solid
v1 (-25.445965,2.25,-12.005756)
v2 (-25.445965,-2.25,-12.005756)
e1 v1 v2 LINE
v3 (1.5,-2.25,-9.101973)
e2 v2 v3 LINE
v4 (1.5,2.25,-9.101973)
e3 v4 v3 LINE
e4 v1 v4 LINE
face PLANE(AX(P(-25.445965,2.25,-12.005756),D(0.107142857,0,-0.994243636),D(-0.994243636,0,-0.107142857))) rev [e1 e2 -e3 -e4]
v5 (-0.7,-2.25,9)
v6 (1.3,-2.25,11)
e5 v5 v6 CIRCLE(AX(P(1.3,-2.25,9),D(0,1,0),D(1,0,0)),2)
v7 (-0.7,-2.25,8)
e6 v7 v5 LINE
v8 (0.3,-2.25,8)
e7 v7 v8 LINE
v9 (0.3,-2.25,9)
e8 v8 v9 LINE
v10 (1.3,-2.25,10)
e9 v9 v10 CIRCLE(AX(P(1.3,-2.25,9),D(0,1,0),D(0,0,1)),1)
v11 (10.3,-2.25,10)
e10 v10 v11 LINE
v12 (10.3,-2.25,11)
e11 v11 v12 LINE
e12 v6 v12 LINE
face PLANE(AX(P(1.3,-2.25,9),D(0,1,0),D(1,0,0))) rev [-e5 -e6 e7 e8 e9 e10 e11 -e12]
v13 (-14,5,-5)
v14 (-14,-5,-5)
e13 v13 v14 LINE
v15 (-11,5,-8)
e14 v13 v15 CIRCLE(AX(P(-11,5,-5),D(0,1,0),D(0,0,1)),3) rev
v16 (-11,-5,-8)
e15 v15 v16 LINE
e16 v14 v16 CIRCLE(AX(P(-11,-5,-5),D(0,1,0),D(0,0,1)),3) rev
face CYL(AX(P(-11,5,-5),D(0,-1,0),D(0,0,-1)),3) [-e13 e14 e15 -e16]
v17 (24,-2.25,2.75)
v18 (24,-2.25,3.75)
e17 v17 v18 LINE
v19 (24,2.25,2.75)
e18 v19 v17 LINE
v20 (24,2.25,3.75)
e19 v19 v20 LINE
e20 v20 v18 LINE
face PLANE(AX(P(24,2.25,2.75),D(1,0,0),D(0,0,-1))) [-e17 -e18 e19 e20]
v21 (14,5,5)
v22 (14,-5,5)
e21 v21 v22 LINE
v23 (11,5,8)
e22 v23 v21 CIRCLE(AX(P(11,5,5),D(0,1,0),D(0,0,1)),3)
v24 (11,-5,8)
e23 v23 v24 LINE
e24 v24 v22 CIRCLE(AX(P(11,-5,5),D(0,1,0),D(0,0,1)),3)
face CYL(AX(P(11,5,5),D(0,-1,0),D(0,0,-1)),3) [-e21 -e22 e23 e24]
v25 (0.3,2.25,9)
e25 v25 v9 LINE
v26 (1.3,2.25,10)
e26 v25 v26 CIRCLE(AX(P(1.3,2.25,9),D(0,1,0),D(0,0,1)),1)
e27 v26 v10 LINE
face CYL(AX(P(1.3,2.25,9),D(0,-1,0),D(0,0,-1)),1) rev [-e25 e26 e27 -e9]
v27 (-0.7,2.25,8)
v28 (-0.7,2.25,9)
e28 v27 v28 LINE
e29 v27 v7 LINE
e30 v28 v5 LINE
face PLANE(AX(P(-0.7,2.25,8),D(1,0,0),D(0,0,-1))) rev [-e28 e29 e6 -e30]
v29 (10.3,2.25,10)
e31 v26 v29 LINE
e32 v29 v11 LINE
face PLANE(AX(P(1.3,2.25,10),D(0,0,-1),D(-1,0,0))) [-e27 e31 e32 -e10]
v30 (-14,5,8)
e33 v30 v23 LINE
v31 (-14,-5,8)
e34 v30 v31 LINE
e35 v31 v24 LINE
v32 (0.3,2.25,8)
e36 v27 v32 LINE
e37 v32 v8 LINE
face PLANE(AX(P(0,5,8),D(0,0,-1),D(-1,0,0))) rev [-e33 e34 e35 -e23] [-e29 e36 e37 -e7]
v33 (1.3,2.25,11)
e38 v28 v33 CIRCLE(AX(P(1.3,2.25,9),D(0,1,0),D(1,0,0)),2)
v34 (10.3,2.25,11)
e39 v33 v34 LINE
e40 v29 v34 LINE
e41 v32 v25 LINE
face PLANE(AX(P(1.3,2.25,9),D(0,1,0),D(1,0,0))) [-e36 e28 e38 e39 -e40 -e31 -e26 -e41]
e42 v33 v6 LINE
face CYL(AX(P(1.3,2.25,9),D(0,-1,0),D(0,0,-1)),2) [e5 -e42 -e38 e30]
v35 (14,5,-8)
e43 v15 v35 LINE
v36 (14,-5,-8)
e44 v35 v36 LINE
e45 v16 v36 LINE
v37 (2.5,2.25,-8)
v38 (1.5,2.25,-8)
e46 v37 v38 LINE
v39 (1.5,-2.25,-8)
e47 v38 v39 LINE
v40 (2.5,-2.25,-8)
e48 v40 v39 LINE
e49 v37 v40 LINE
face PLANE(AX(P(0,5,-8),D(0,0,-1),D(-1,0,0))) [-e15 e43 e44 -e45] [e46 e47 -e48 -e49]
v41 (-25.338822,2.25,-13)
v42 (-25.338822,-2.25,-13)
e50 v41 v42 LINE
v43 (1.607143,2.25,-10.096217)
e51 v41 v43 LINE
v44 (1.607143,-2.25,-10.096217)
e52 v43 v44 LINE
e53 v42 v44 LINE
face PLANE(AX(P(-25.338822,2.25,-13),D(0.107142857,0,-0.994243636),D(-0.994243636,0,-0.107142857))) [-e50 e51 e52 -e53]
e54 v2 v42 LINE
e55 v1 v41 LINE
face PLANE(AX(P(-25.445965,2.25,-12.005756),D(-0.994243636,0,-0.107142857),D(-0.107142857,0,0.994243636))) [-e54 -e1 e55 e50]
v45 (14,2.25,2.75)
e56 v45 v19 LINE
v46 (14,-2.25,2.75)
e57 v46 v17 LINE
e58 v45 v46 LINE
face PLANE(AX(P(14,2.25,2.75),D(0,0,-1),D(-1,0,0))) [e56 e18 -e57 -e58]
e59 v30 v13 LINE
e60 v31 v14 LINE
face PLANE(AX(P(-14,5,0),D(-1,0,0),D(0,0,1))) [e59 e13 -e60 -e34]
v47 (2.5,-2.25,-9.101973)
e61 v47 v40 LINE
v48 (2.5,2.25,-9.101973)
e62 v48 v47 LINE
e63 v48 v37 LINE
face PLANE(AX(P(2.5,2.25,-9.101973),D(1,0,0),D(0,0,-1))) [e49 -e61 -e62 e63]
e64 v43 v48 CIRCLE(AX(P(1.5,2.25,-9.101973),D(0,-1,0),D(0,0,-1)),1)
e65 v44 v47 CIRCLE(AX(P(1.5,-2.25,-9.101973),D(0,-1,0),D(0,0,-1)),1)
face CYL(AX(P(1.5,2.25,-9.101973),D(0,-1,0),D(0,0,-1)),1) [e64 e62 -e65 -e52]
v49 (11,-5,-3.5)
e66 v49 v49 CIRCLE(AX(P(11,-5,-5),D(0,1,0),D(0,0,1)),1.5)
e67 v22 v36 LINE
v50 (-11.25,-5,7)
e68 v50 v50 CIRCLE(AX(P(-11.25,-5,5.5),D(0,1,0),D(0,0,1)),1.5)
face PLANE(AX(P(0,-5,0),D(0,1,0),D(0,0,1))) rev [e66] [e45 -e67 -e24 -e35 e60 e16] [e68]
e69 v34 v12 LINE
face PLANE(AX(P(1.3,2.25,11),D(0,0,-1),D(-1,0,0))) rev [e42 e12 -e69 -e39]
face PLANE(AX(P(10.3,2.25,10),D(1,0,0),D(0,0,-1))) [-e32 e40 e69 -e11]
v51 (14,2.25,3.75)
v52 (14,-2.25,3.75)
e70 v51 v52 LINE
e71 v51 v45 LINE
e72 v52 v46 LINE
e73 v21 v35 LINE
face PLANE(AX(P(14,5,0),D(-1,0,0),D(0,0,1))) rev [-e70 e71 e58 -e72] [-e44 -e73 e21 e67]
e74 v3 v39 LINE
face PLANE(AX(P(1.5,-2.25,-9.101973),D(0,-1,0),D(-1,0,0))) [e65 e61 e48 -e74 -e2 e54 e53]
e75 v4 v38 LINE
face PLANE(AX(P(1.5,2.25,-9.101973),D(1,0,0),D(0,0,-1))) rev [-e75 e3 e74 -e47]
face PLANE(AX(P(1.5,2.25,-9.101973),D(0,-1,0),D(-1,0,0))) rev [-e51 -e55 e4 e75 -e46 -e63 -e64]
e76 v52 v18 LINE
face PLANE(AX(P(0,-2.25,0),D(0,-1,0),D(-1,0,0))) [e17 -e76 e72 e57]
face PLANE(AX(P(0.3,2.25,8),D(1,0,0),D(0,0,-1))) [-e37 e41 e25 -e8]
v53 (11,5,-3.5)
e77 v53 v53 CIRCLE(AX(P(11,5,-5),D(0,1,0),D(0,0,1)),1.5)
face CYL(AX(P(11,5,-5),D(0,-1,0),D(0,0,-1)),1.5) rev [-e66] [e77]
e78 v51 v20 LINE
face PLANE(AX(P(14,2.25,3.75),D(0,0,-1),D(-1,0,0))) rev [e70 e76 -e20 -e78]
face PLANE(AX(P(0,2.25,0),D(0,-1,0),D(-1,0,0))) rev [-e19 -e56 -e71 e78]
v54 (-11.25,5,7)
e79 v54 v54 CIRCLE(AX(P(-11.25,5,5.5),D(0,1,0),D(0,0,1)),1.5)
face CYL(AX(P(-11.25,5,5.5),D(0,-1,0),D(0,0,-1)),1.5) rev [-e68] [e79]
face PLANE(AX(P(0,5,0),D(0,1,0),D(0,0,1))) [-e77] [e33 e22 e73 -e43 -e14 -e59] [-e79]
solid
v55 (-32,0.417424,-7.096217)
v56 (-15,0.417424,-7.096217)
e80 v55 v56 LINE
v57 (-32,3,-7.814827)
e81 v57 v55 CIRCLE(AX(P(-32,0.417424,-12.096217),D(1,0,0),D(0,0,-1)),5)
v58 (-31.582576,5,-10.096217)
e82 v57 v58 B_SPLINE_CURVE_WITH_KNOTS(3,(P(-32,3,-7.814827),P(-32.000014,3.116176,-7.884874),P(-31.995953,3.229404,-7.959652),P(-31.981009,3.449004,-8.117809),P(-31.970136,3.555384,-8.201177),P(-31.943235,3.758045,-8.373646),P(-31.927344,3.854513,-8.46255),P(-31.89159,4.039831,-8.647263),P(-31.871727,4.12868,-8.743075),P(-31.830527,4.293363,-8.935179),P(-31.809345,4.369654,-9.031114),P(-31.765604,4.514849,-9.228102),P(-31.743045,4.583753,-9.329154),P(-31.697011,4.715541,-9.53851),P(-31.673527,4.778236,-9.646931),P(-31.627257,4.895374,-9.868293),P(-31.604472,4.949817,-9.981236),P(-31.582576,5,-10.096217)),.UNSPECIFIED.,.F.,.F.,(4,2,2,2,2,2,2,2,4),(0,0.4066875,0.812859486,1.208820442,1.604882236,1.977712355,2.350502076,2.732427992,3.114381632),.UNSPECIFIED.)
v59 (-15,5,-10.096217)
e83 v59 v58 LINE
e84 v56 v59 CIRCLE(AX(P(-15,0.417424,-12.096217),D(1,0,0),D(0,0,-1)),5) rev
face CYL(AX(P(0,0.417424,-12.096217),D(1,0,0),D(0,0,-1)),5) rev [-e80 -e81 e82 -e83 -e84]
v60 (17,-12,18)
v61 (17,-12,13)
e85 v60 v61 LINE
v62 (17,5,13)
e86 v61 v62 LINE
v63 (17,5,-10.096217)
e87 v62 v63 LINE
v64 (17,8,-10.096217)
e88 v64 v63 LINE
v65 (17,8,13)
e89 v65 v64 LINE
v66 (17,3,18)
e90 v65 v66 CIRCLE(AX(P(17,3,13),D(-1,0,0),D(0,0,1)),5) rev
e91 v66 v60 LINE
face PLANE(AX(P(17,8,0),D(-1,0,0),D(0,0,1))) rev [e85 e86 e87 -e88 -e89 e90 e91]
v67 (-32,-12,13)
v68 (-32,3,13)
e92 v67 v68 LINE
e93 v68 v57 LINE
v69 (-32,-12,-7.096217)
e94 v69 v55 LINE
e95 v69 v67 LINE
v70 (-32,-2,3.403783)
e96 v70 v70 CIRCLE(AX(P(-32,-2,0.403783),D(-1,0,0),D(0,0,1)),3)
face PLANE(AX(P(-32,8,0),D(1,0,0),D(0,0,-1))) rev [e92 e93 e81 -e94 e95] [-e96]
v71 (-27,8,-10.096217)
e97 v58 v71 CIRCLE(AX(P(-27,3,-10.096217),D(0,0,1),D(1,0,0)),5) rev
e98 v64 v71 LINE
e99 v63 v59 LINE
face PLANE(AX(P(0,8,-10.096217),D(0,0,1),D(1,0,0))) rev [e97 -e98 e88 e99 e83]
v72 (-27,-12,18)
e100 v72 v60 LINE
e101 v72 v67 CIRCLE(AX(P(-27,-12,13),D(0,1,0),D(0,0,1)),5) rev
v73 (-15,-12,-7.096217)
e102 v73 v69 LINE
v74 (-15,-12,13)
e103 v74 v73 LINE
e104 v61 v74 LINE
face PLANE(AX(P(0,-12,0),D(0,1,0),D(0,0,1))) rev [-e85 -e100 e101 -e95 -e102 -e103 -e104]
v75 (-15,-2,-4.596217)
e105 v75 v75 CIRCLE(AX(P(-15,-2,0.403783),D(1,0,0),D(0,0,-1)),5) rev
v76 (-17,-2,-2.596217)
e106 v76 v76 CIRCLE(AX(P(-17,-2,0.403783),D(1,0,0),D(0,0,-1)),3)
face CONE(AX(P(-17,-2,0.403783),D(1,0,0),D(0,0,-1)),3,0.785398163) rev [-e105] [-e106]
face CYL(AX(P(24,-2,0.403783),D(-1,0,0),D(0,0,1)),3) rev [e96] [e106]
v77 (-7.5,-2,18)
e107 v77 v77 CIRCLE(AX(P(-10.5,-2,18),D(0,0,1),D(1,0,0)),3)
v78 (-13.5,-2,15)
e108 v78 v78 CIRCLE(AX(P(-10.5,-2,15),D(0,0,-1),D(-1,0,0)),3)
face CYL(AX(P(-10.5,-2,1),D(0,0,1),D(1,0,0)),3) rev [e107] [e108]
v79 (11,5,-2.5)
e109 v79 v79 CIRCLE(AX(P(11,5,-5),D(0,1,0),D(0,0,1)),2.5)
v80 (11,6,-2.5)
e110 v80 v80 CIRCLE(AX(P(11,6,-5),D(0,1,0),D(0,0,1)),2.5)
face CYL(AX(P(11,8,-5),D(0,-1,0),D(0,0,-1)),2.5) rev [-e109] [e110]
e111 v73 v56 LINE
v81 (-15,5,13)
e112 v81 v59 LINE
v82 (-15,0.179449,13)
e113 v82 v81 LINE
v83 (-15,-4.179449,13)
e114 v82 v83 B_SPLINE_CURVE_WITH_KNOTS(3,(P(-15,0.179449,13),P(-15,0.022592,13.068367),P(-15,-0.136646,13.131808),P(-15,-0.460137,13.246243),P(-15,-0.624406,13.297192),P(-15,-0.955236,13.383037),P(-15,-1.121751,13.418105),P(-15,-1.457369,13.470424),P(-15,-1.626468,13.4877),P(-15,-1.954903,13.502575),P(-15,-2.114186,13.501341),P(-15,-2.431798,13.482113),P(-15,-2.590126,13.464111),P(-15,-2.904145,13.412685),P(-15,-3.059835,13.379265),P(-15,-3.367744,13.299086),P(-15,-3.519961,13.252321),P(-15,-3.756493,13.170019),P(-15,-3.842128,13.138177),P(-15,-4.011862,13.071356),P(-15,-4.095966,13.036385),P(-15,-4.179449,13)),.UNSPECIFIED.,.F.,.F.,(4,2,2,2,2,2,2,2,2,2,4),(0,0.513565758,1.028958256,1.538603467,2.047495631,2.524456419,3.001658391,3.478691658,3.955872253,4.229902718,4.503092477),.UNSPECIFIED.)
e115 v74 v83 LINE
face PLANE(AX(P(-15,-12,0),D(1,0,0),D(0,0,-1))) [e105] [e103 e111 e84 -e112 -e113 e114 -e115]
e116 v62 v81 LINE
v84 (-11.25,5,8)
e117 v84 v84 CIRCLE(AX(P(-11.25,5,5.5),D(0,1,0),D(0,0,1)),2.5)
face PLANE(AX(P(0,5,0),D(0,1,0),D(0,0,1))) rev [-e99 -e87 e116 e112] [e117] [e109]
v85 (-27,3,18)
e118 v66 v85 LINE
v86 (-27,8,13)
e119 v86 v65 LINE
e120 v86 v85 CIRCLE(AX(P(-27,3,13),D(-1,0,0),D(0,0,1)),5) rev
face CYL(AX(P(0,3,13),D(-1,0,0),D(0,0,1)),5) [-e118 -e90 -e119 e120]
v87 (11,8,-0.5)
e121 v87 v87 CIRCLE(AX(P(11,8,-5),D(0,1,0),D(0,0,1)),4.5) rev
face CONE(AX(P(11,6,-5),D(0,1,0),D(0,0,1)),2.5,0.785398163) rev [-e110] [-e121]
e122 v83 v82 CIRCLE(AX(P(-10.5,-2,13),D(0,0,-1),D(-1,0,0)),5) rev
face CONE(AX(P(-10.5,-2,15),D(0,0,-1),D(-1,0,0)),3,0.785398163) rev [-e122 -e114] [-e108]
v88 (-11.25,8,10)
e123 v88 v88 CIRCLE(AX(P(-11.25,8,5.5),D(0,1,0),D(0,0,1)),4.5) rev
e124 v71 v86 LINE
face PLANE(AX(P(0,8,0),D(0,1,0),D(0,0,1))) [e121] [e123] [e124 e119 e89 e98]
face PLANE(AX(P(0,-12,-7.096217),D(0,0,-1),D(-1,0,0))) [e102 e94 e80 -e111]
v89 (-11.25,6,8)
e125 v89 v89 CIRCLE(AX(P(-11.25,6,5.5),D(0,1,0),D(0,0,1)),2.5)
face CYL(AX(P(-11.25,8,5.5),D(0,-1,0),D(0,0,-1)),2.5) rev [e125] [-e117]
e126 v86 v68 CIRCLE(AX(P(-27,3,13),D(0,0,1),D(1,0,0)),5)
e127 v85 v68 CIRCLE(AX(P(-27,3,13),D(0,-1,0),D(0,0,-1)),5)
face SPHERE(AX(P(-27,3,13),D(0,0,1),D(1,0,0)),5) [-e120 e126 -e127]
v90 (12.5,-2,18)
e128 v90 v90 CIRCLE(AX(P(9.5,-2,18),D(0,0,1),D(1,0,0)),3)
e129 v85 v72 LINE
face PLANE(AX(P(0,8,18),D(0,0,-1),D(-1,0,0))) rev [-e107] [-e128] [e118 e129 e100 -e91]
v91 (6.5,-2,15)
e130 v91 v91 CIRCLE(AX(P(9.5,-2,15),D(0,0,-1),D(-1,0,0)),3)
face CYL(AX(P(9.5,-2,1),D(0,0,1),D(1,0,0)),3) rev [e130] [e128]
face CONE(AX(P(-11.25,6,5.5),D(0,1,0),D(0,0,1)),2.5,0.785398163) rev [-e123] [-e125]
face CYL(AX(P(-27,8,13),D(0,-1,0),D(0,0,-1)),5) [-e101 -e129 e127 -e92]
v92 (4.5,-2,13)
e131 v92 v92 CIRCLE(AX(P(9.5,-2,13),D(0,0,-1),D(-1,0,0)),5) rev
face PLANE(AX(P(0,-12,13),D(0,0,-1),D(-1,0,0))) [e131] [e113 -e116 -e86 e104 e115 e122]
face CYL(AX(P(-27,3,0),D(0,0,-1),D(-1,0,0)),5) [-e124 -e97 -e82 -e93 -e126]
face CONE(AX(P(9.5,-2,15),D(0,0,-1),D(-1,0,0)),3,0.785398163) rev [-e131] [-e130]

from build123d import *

# Parameters (mm, degrees)
LIMIT_START                     = -5
LIMIT_SWITCH_LARGER_OUTLINE_R   = 1.5
LIMIT_SWITCH_LARGER_DEPTH       = 10
LIMIT_START_2                   = -2.25
LIMIT_SWITCH_LARGER_2_OUTLINE_W = 10
LIMIT_SWITCH_LARGER_2_OUTLINE_H = 1
LIMIT_SWITCH_LARGER_2_DEPTH     = 4.5
SKETCH1_W                       = 49
SKETCH1_H                       = 28.096217126
SKETCH1_R                       = 2.5
BOSS_EXTRUDE2_DEPTH             = 3
BOSS_EXTRUDE3_DEPTH             = 17
SKETCH5_R                       = 3
CUT_EXTRUDE2_DEPTH              = 17
SKETCH6_R                       = 3
CUT_EXTRUDE3_DEPTH              = 61.033324079
CHAMFER2_SIZE                   = 2
FILLET2_R                       = 5
FILLET3_R                       = 5


with BuildPart() as part:
    # Limit Switch_Larger: read off the stored shape, not the designer's step
    # Limit Switch_Larger outline → Limit Switch_Larger (new body)
    with BuildSketch(Plane(origin=(0, 0, 0), x_dir=(1, 0, 0), z_dir=(0, 1, 0)).offset(LIMIT_START)):
        with BuildLine():
            Line((14, -5), (14, 8))
            Line((14, 8), (-11, 8))
            ThreePointArc((-11, 8), (-13.121320344, 7.121320344), (-14, 5))
            Line((-14, 5), (-14, -8))
            Line((-14, -8), (11, -8))
            ThreePointArc((11, -8), (13.121320344, -7.121320344), (14, -5))
        make_face()
        with Locations((-11.25, -5.5)):
            Circle(LIMIT_SWITCH_LARGER_OUTLINE_R, mode=Mode.SUBTRACT)
        with Locations((11, 5)):
            Circle(LIMIT_SWITCH_LARGER_OUTLINE_R, mode=Mode.SUBTRACT)
    extrude(amount=LIMIT_SWITCH_LARGER_DEPTH)

    # Limit Switch_Larger 2 outline → Limit Switch_Larger 2 (add)
    with BuildSketch(Plane(origin=(0, 0, 0), x_dir=(1, 0, 0), z_dir=(0, 1, 0)).offset(LIMIT_START_2)):
        with Locations((19, -3.25)):
            Rectangle(LIMIT_SWITCH_LARGER_2_OUTLINE_W, LIMIT_SWITCH_LARGER_2_OUTLINE_H)
        with BuildLine():
            Line((1.5, 8), (2.5, 8))
            Line((2.5, 8), (2.5, 9.10197349))
            ThreePointArc((2.5, 9.10197349), (2.244023809, 9.770126595), (1.607142857, 10.096217126))
            Line((1.607142857, 10.096217126), (-25.338821814, 13))
            Line((-25.338821814, 13), (-25.445964671, 12.005756364))
            Line((-25.445964671, 12.005756364), (1.5, 9.10197349))
            Line((1.5, 9.10197349), (1.5, 8))
        make_face()
        with BuildLine():
            Line((0.3, -9), (0.3, -8))
            Line((0.3, -8), (-0.7, -8))
            Line((-0.7, -8), (-0.7, -9))
            ThreePointArc((-0.7, -9), (-0.114213562, -10.414213562), (1.3, -11))
            Line((1.3, -11), (10.3, -11))
            Line((10.3, -11), (10.3, -10))
            Line((10.3, -10), (1.3, -10))
            ThreePointArc((1.3, -10), (0.592893219, -9.707106781), (0.3, -9))
        make_face()
    extrude(amount=LIMIT_SWITCH_LARGER_2_DEPTH)


with BuildPart() as body_2:
    # Sketch1 → Boss-Extrude2 (new body)
    with BuildSketch(Plane(origin=(0, 5, 0), x_dir=(1, 0, 0), z_dir=(0, 1, 0))):
        with Locations((-7.5, -3.951891437)):
            Rectangle(SKETCH1_W, SKETCH1_H)
        with Locations(Location((-11.25, -5.5, 0), (0, 0, 270))):
            Circle(SKETCH1_R, mode=Mode.SUBTRACT)
        with Locations(Location((11, 5, 0), (0, 0, 270))):
            Circle(SKETCH1_R, mode=Mode.SUBTRACT)
    extrude(amount=BOSS_EXTRUDE2_DEPTH)

    # Sketch1<3> → Boss-Extrude3 (add)
    with BuildSketch(Plane(origin=(0, 5, 0), x_dir=(1, 0, 0), z_dir=(0, 1, 0))):
        Polygon((17, -18), (17, -13), (-15, -13), (-15, 7.096217126), (-32, 7.096217126), (-32, -18), align=None)
    extrude(amount=-BOSS_EXTRUDE3_DEPTH)

    # Sketch5 → Cut-Extrude2 (cut)
    with BuildSketch(Plane.XY.offset(18)):
        with Locations((-10.5, -2)):
            Circle(SKETCH5_R)
        with Locations((9.5, -2)):
            Circle(SKETCH5_R)
    extrude(amount=-CUT_EXTRUDE2_DEPTH, mode=Mode.SUBTRACT)

    # Sketch6 → Cut-Extrude3 (cut, through all)
    with BuildSketch(Plane.ZY.offset(32)):
        with Locations((0.403782874, -2)):
            Circle(SKETCH6_R)
    extrude(amount=-CUT_EXTRUDE3_DEPTH, mode=Mode.SUBTRACT)

    # Chamfer2
    # the kernel refuses this chamfer: 2 mm, written as the material it takes off along each edge
    with BuildSketch(Plane(origin=(-11.25, 8, 5.5), x_dir=(0, 0, 1), z_dir=(-1, 0, 0))) as chamfer2_piece_1:
        Polygon((2.5 + CHAMFER2_SIZE, 0), (2.5, -CHAMFER2_SIZE), (2.5, 0), align=None)
    revolve(axis=Axis((-11.25, 8, 5.5), (0, 1, 0)), mode=Mode.SUBTRACT)
    with BuildSketch(Plane(origin=(11, 8, -5), x_dir=(0, 0, 1), z_dir=(-1, 0, 0))) as chamfer2_piece_2:
        Polygon((2.5 + CHAMFER2_SIZE, 0), (2.5, -CHAMFER2_SIZE), (2.5, 0), align=None)
    revolve(axis=Axis((11, 8, -5), (0, 1, 0)), mode=Mode.SUBTRACT)
    with BuildSketch(Plane(origin=(-10.5, -2, 13), x_dir=(1, 0, 0), z_dir=(0, -1, 0))) as chamfer2_piece_3_section:
        Polygon((3 + CHAMFER2_SIZE, 0), (3, CHAMFER2_SIZE), (3, 0), align=None)
    chamfer2_piece_3 = revolve(axis=Axis((-10.5, -2, 13), (0, 0, 1)), mode=Mode.PRIVATE)
    chamfer2_piece_3 = split(chamfer2_piece_3, bisect_by=Plane(origin=(-15, -2, 13), z_dir=(1, 0, 0)), keep=Keep.TOP, mode=Mode.PRIVATE)
    add(chamfer2_piece_3, mode=Mode.SUBTRACT)
    with BuildSketch(Plane(origin=(9.5, -2, 13), x_dir=(1, 0, 0), z_dir=(0, -1, 0))) as chamfer2_piece_4:
        Polygon((3 + CHAMFER2_SIZE, 0), (3, CHAMFER2_SIZE), (3, 0), align=None)
    revolve(axis=Axis((9.5, -2, 13), (0, 0, 1)), mode=Mode.SUBTRACT)
    with BuildSketch(Plane(origin=(-15, -2, 0.403782874), x_dir=(0, 0, 1), z_dir=(0, -1, 0))) as chamfer2_piece_5:
        Polygon((3, CHAMFER2_SIZE), (3 + CHAMFER2_SIZE, 0), (3, 0), align=None)
    revolve(axis=Axis((-15, -2, 0.403782874), (-1, 0, 0)), mode=Mode.SUBTRACT)

    # Fillet2
    # the kernel refuses this fillet: 5 mm, written as the material it adds along each edge
    with BuildSketch(Plane(origin=(-15, 5, -7.096217126), x_dir=(0, 0, -1), z_dir=(-1, 0, 0))) as fillet2_piece_1:
        with BuildLine():
            CenterArc((5, 4.582575695), FILLET2_R, 180, 66.421821522)
            Line((0, 4.582575695), (0, 0))
            Line((0, 0), (3, 0))
        make_face()
    extrude(amount=17)
    # the kernel refuses this fillet: 5 mm, written as the material it takes off along each edge
    with BuildSketch(Plane(origin=(-32, -24.5, 18), x_dir=(1, 0, 0), z_dir=(0, 1, 0))) as fillet2_2_piece_1:
        with BuildLine():
            CenterArc((FILLET2_R, FILLET2_R), FILLET2_R, 180, 90)
            Line((0, FILLET2_R), (0, 0))
            Line((0, 0), (FILLET2_R, 0))
        make_face()
    extrude(amount=45, mode=Mode.SUBTRACT)
    with BuildSketch(Plane(origin=(-44.5, 8, 18), x_dir=(0, 0, -1), z_dir=(1, 0, 0))) as fillet2_2_piece_2:
        with BuildLine():
            CenterArc((FILLET2_R, -FILLET2_R), FILLET2_R, 90, 90)
            Line((0, -FILLET2_R), (0, 0))
            Line((0, 0), (FILLET2_R, 0))
        make_face()
    extrude(amount=74, mode=Mode.SUBTRACT)

    # Fillet3
    # the kernel refuses this fillet: 5 mm, written as the material it takes off along each edge
    with BuildSketch(Plane(origin=(-27, 3, 13), x_dir=(0, 1, 0), z_dir=(-1, 0, 0))) as fillet3_piece_1_section:
        Polygon((0, 0), (FILLET3_R, 0), (FILLET3_R, -FILLET3_R), (0, -FILLET3_R), align=None)
    fillet3_piece_1 = extrude(amount=FILLET3_R, mode=Mode.PRIVATE)
    fillet3_piece_1 = fillet3_piece_1 - Plane(origin=(-27, 3, 13), x_dir=(0, -0.7071067811865475, -0.7071067811865475), z_dir=(-1, 0, 0)) * Sphere(FILLET3_R, mode=Mode.PRIVATE)
    add(fillet3_piece_1, mode=Mode.SUBTRACT)
    with BuildSketch(Plane(origin=(-32, 8, -22.596217126), x_dir=(0, -1, 0), z_dir=(0, 0, 1))) as fillet3_piece_2:
        with BuildLine():
            CenterArc((FILLET3_R, FILLET3_R), FILLET3_R, 180, 90)
            Line((0, FILLET3_R), (0, 0))
            Line((0, 0), (FILLET3_R, 0))
        make_face()
    extrude(amount=35.596217126, mode=Mode.SUBTRACT)


solid = Compound([part.part, body_2.part])
